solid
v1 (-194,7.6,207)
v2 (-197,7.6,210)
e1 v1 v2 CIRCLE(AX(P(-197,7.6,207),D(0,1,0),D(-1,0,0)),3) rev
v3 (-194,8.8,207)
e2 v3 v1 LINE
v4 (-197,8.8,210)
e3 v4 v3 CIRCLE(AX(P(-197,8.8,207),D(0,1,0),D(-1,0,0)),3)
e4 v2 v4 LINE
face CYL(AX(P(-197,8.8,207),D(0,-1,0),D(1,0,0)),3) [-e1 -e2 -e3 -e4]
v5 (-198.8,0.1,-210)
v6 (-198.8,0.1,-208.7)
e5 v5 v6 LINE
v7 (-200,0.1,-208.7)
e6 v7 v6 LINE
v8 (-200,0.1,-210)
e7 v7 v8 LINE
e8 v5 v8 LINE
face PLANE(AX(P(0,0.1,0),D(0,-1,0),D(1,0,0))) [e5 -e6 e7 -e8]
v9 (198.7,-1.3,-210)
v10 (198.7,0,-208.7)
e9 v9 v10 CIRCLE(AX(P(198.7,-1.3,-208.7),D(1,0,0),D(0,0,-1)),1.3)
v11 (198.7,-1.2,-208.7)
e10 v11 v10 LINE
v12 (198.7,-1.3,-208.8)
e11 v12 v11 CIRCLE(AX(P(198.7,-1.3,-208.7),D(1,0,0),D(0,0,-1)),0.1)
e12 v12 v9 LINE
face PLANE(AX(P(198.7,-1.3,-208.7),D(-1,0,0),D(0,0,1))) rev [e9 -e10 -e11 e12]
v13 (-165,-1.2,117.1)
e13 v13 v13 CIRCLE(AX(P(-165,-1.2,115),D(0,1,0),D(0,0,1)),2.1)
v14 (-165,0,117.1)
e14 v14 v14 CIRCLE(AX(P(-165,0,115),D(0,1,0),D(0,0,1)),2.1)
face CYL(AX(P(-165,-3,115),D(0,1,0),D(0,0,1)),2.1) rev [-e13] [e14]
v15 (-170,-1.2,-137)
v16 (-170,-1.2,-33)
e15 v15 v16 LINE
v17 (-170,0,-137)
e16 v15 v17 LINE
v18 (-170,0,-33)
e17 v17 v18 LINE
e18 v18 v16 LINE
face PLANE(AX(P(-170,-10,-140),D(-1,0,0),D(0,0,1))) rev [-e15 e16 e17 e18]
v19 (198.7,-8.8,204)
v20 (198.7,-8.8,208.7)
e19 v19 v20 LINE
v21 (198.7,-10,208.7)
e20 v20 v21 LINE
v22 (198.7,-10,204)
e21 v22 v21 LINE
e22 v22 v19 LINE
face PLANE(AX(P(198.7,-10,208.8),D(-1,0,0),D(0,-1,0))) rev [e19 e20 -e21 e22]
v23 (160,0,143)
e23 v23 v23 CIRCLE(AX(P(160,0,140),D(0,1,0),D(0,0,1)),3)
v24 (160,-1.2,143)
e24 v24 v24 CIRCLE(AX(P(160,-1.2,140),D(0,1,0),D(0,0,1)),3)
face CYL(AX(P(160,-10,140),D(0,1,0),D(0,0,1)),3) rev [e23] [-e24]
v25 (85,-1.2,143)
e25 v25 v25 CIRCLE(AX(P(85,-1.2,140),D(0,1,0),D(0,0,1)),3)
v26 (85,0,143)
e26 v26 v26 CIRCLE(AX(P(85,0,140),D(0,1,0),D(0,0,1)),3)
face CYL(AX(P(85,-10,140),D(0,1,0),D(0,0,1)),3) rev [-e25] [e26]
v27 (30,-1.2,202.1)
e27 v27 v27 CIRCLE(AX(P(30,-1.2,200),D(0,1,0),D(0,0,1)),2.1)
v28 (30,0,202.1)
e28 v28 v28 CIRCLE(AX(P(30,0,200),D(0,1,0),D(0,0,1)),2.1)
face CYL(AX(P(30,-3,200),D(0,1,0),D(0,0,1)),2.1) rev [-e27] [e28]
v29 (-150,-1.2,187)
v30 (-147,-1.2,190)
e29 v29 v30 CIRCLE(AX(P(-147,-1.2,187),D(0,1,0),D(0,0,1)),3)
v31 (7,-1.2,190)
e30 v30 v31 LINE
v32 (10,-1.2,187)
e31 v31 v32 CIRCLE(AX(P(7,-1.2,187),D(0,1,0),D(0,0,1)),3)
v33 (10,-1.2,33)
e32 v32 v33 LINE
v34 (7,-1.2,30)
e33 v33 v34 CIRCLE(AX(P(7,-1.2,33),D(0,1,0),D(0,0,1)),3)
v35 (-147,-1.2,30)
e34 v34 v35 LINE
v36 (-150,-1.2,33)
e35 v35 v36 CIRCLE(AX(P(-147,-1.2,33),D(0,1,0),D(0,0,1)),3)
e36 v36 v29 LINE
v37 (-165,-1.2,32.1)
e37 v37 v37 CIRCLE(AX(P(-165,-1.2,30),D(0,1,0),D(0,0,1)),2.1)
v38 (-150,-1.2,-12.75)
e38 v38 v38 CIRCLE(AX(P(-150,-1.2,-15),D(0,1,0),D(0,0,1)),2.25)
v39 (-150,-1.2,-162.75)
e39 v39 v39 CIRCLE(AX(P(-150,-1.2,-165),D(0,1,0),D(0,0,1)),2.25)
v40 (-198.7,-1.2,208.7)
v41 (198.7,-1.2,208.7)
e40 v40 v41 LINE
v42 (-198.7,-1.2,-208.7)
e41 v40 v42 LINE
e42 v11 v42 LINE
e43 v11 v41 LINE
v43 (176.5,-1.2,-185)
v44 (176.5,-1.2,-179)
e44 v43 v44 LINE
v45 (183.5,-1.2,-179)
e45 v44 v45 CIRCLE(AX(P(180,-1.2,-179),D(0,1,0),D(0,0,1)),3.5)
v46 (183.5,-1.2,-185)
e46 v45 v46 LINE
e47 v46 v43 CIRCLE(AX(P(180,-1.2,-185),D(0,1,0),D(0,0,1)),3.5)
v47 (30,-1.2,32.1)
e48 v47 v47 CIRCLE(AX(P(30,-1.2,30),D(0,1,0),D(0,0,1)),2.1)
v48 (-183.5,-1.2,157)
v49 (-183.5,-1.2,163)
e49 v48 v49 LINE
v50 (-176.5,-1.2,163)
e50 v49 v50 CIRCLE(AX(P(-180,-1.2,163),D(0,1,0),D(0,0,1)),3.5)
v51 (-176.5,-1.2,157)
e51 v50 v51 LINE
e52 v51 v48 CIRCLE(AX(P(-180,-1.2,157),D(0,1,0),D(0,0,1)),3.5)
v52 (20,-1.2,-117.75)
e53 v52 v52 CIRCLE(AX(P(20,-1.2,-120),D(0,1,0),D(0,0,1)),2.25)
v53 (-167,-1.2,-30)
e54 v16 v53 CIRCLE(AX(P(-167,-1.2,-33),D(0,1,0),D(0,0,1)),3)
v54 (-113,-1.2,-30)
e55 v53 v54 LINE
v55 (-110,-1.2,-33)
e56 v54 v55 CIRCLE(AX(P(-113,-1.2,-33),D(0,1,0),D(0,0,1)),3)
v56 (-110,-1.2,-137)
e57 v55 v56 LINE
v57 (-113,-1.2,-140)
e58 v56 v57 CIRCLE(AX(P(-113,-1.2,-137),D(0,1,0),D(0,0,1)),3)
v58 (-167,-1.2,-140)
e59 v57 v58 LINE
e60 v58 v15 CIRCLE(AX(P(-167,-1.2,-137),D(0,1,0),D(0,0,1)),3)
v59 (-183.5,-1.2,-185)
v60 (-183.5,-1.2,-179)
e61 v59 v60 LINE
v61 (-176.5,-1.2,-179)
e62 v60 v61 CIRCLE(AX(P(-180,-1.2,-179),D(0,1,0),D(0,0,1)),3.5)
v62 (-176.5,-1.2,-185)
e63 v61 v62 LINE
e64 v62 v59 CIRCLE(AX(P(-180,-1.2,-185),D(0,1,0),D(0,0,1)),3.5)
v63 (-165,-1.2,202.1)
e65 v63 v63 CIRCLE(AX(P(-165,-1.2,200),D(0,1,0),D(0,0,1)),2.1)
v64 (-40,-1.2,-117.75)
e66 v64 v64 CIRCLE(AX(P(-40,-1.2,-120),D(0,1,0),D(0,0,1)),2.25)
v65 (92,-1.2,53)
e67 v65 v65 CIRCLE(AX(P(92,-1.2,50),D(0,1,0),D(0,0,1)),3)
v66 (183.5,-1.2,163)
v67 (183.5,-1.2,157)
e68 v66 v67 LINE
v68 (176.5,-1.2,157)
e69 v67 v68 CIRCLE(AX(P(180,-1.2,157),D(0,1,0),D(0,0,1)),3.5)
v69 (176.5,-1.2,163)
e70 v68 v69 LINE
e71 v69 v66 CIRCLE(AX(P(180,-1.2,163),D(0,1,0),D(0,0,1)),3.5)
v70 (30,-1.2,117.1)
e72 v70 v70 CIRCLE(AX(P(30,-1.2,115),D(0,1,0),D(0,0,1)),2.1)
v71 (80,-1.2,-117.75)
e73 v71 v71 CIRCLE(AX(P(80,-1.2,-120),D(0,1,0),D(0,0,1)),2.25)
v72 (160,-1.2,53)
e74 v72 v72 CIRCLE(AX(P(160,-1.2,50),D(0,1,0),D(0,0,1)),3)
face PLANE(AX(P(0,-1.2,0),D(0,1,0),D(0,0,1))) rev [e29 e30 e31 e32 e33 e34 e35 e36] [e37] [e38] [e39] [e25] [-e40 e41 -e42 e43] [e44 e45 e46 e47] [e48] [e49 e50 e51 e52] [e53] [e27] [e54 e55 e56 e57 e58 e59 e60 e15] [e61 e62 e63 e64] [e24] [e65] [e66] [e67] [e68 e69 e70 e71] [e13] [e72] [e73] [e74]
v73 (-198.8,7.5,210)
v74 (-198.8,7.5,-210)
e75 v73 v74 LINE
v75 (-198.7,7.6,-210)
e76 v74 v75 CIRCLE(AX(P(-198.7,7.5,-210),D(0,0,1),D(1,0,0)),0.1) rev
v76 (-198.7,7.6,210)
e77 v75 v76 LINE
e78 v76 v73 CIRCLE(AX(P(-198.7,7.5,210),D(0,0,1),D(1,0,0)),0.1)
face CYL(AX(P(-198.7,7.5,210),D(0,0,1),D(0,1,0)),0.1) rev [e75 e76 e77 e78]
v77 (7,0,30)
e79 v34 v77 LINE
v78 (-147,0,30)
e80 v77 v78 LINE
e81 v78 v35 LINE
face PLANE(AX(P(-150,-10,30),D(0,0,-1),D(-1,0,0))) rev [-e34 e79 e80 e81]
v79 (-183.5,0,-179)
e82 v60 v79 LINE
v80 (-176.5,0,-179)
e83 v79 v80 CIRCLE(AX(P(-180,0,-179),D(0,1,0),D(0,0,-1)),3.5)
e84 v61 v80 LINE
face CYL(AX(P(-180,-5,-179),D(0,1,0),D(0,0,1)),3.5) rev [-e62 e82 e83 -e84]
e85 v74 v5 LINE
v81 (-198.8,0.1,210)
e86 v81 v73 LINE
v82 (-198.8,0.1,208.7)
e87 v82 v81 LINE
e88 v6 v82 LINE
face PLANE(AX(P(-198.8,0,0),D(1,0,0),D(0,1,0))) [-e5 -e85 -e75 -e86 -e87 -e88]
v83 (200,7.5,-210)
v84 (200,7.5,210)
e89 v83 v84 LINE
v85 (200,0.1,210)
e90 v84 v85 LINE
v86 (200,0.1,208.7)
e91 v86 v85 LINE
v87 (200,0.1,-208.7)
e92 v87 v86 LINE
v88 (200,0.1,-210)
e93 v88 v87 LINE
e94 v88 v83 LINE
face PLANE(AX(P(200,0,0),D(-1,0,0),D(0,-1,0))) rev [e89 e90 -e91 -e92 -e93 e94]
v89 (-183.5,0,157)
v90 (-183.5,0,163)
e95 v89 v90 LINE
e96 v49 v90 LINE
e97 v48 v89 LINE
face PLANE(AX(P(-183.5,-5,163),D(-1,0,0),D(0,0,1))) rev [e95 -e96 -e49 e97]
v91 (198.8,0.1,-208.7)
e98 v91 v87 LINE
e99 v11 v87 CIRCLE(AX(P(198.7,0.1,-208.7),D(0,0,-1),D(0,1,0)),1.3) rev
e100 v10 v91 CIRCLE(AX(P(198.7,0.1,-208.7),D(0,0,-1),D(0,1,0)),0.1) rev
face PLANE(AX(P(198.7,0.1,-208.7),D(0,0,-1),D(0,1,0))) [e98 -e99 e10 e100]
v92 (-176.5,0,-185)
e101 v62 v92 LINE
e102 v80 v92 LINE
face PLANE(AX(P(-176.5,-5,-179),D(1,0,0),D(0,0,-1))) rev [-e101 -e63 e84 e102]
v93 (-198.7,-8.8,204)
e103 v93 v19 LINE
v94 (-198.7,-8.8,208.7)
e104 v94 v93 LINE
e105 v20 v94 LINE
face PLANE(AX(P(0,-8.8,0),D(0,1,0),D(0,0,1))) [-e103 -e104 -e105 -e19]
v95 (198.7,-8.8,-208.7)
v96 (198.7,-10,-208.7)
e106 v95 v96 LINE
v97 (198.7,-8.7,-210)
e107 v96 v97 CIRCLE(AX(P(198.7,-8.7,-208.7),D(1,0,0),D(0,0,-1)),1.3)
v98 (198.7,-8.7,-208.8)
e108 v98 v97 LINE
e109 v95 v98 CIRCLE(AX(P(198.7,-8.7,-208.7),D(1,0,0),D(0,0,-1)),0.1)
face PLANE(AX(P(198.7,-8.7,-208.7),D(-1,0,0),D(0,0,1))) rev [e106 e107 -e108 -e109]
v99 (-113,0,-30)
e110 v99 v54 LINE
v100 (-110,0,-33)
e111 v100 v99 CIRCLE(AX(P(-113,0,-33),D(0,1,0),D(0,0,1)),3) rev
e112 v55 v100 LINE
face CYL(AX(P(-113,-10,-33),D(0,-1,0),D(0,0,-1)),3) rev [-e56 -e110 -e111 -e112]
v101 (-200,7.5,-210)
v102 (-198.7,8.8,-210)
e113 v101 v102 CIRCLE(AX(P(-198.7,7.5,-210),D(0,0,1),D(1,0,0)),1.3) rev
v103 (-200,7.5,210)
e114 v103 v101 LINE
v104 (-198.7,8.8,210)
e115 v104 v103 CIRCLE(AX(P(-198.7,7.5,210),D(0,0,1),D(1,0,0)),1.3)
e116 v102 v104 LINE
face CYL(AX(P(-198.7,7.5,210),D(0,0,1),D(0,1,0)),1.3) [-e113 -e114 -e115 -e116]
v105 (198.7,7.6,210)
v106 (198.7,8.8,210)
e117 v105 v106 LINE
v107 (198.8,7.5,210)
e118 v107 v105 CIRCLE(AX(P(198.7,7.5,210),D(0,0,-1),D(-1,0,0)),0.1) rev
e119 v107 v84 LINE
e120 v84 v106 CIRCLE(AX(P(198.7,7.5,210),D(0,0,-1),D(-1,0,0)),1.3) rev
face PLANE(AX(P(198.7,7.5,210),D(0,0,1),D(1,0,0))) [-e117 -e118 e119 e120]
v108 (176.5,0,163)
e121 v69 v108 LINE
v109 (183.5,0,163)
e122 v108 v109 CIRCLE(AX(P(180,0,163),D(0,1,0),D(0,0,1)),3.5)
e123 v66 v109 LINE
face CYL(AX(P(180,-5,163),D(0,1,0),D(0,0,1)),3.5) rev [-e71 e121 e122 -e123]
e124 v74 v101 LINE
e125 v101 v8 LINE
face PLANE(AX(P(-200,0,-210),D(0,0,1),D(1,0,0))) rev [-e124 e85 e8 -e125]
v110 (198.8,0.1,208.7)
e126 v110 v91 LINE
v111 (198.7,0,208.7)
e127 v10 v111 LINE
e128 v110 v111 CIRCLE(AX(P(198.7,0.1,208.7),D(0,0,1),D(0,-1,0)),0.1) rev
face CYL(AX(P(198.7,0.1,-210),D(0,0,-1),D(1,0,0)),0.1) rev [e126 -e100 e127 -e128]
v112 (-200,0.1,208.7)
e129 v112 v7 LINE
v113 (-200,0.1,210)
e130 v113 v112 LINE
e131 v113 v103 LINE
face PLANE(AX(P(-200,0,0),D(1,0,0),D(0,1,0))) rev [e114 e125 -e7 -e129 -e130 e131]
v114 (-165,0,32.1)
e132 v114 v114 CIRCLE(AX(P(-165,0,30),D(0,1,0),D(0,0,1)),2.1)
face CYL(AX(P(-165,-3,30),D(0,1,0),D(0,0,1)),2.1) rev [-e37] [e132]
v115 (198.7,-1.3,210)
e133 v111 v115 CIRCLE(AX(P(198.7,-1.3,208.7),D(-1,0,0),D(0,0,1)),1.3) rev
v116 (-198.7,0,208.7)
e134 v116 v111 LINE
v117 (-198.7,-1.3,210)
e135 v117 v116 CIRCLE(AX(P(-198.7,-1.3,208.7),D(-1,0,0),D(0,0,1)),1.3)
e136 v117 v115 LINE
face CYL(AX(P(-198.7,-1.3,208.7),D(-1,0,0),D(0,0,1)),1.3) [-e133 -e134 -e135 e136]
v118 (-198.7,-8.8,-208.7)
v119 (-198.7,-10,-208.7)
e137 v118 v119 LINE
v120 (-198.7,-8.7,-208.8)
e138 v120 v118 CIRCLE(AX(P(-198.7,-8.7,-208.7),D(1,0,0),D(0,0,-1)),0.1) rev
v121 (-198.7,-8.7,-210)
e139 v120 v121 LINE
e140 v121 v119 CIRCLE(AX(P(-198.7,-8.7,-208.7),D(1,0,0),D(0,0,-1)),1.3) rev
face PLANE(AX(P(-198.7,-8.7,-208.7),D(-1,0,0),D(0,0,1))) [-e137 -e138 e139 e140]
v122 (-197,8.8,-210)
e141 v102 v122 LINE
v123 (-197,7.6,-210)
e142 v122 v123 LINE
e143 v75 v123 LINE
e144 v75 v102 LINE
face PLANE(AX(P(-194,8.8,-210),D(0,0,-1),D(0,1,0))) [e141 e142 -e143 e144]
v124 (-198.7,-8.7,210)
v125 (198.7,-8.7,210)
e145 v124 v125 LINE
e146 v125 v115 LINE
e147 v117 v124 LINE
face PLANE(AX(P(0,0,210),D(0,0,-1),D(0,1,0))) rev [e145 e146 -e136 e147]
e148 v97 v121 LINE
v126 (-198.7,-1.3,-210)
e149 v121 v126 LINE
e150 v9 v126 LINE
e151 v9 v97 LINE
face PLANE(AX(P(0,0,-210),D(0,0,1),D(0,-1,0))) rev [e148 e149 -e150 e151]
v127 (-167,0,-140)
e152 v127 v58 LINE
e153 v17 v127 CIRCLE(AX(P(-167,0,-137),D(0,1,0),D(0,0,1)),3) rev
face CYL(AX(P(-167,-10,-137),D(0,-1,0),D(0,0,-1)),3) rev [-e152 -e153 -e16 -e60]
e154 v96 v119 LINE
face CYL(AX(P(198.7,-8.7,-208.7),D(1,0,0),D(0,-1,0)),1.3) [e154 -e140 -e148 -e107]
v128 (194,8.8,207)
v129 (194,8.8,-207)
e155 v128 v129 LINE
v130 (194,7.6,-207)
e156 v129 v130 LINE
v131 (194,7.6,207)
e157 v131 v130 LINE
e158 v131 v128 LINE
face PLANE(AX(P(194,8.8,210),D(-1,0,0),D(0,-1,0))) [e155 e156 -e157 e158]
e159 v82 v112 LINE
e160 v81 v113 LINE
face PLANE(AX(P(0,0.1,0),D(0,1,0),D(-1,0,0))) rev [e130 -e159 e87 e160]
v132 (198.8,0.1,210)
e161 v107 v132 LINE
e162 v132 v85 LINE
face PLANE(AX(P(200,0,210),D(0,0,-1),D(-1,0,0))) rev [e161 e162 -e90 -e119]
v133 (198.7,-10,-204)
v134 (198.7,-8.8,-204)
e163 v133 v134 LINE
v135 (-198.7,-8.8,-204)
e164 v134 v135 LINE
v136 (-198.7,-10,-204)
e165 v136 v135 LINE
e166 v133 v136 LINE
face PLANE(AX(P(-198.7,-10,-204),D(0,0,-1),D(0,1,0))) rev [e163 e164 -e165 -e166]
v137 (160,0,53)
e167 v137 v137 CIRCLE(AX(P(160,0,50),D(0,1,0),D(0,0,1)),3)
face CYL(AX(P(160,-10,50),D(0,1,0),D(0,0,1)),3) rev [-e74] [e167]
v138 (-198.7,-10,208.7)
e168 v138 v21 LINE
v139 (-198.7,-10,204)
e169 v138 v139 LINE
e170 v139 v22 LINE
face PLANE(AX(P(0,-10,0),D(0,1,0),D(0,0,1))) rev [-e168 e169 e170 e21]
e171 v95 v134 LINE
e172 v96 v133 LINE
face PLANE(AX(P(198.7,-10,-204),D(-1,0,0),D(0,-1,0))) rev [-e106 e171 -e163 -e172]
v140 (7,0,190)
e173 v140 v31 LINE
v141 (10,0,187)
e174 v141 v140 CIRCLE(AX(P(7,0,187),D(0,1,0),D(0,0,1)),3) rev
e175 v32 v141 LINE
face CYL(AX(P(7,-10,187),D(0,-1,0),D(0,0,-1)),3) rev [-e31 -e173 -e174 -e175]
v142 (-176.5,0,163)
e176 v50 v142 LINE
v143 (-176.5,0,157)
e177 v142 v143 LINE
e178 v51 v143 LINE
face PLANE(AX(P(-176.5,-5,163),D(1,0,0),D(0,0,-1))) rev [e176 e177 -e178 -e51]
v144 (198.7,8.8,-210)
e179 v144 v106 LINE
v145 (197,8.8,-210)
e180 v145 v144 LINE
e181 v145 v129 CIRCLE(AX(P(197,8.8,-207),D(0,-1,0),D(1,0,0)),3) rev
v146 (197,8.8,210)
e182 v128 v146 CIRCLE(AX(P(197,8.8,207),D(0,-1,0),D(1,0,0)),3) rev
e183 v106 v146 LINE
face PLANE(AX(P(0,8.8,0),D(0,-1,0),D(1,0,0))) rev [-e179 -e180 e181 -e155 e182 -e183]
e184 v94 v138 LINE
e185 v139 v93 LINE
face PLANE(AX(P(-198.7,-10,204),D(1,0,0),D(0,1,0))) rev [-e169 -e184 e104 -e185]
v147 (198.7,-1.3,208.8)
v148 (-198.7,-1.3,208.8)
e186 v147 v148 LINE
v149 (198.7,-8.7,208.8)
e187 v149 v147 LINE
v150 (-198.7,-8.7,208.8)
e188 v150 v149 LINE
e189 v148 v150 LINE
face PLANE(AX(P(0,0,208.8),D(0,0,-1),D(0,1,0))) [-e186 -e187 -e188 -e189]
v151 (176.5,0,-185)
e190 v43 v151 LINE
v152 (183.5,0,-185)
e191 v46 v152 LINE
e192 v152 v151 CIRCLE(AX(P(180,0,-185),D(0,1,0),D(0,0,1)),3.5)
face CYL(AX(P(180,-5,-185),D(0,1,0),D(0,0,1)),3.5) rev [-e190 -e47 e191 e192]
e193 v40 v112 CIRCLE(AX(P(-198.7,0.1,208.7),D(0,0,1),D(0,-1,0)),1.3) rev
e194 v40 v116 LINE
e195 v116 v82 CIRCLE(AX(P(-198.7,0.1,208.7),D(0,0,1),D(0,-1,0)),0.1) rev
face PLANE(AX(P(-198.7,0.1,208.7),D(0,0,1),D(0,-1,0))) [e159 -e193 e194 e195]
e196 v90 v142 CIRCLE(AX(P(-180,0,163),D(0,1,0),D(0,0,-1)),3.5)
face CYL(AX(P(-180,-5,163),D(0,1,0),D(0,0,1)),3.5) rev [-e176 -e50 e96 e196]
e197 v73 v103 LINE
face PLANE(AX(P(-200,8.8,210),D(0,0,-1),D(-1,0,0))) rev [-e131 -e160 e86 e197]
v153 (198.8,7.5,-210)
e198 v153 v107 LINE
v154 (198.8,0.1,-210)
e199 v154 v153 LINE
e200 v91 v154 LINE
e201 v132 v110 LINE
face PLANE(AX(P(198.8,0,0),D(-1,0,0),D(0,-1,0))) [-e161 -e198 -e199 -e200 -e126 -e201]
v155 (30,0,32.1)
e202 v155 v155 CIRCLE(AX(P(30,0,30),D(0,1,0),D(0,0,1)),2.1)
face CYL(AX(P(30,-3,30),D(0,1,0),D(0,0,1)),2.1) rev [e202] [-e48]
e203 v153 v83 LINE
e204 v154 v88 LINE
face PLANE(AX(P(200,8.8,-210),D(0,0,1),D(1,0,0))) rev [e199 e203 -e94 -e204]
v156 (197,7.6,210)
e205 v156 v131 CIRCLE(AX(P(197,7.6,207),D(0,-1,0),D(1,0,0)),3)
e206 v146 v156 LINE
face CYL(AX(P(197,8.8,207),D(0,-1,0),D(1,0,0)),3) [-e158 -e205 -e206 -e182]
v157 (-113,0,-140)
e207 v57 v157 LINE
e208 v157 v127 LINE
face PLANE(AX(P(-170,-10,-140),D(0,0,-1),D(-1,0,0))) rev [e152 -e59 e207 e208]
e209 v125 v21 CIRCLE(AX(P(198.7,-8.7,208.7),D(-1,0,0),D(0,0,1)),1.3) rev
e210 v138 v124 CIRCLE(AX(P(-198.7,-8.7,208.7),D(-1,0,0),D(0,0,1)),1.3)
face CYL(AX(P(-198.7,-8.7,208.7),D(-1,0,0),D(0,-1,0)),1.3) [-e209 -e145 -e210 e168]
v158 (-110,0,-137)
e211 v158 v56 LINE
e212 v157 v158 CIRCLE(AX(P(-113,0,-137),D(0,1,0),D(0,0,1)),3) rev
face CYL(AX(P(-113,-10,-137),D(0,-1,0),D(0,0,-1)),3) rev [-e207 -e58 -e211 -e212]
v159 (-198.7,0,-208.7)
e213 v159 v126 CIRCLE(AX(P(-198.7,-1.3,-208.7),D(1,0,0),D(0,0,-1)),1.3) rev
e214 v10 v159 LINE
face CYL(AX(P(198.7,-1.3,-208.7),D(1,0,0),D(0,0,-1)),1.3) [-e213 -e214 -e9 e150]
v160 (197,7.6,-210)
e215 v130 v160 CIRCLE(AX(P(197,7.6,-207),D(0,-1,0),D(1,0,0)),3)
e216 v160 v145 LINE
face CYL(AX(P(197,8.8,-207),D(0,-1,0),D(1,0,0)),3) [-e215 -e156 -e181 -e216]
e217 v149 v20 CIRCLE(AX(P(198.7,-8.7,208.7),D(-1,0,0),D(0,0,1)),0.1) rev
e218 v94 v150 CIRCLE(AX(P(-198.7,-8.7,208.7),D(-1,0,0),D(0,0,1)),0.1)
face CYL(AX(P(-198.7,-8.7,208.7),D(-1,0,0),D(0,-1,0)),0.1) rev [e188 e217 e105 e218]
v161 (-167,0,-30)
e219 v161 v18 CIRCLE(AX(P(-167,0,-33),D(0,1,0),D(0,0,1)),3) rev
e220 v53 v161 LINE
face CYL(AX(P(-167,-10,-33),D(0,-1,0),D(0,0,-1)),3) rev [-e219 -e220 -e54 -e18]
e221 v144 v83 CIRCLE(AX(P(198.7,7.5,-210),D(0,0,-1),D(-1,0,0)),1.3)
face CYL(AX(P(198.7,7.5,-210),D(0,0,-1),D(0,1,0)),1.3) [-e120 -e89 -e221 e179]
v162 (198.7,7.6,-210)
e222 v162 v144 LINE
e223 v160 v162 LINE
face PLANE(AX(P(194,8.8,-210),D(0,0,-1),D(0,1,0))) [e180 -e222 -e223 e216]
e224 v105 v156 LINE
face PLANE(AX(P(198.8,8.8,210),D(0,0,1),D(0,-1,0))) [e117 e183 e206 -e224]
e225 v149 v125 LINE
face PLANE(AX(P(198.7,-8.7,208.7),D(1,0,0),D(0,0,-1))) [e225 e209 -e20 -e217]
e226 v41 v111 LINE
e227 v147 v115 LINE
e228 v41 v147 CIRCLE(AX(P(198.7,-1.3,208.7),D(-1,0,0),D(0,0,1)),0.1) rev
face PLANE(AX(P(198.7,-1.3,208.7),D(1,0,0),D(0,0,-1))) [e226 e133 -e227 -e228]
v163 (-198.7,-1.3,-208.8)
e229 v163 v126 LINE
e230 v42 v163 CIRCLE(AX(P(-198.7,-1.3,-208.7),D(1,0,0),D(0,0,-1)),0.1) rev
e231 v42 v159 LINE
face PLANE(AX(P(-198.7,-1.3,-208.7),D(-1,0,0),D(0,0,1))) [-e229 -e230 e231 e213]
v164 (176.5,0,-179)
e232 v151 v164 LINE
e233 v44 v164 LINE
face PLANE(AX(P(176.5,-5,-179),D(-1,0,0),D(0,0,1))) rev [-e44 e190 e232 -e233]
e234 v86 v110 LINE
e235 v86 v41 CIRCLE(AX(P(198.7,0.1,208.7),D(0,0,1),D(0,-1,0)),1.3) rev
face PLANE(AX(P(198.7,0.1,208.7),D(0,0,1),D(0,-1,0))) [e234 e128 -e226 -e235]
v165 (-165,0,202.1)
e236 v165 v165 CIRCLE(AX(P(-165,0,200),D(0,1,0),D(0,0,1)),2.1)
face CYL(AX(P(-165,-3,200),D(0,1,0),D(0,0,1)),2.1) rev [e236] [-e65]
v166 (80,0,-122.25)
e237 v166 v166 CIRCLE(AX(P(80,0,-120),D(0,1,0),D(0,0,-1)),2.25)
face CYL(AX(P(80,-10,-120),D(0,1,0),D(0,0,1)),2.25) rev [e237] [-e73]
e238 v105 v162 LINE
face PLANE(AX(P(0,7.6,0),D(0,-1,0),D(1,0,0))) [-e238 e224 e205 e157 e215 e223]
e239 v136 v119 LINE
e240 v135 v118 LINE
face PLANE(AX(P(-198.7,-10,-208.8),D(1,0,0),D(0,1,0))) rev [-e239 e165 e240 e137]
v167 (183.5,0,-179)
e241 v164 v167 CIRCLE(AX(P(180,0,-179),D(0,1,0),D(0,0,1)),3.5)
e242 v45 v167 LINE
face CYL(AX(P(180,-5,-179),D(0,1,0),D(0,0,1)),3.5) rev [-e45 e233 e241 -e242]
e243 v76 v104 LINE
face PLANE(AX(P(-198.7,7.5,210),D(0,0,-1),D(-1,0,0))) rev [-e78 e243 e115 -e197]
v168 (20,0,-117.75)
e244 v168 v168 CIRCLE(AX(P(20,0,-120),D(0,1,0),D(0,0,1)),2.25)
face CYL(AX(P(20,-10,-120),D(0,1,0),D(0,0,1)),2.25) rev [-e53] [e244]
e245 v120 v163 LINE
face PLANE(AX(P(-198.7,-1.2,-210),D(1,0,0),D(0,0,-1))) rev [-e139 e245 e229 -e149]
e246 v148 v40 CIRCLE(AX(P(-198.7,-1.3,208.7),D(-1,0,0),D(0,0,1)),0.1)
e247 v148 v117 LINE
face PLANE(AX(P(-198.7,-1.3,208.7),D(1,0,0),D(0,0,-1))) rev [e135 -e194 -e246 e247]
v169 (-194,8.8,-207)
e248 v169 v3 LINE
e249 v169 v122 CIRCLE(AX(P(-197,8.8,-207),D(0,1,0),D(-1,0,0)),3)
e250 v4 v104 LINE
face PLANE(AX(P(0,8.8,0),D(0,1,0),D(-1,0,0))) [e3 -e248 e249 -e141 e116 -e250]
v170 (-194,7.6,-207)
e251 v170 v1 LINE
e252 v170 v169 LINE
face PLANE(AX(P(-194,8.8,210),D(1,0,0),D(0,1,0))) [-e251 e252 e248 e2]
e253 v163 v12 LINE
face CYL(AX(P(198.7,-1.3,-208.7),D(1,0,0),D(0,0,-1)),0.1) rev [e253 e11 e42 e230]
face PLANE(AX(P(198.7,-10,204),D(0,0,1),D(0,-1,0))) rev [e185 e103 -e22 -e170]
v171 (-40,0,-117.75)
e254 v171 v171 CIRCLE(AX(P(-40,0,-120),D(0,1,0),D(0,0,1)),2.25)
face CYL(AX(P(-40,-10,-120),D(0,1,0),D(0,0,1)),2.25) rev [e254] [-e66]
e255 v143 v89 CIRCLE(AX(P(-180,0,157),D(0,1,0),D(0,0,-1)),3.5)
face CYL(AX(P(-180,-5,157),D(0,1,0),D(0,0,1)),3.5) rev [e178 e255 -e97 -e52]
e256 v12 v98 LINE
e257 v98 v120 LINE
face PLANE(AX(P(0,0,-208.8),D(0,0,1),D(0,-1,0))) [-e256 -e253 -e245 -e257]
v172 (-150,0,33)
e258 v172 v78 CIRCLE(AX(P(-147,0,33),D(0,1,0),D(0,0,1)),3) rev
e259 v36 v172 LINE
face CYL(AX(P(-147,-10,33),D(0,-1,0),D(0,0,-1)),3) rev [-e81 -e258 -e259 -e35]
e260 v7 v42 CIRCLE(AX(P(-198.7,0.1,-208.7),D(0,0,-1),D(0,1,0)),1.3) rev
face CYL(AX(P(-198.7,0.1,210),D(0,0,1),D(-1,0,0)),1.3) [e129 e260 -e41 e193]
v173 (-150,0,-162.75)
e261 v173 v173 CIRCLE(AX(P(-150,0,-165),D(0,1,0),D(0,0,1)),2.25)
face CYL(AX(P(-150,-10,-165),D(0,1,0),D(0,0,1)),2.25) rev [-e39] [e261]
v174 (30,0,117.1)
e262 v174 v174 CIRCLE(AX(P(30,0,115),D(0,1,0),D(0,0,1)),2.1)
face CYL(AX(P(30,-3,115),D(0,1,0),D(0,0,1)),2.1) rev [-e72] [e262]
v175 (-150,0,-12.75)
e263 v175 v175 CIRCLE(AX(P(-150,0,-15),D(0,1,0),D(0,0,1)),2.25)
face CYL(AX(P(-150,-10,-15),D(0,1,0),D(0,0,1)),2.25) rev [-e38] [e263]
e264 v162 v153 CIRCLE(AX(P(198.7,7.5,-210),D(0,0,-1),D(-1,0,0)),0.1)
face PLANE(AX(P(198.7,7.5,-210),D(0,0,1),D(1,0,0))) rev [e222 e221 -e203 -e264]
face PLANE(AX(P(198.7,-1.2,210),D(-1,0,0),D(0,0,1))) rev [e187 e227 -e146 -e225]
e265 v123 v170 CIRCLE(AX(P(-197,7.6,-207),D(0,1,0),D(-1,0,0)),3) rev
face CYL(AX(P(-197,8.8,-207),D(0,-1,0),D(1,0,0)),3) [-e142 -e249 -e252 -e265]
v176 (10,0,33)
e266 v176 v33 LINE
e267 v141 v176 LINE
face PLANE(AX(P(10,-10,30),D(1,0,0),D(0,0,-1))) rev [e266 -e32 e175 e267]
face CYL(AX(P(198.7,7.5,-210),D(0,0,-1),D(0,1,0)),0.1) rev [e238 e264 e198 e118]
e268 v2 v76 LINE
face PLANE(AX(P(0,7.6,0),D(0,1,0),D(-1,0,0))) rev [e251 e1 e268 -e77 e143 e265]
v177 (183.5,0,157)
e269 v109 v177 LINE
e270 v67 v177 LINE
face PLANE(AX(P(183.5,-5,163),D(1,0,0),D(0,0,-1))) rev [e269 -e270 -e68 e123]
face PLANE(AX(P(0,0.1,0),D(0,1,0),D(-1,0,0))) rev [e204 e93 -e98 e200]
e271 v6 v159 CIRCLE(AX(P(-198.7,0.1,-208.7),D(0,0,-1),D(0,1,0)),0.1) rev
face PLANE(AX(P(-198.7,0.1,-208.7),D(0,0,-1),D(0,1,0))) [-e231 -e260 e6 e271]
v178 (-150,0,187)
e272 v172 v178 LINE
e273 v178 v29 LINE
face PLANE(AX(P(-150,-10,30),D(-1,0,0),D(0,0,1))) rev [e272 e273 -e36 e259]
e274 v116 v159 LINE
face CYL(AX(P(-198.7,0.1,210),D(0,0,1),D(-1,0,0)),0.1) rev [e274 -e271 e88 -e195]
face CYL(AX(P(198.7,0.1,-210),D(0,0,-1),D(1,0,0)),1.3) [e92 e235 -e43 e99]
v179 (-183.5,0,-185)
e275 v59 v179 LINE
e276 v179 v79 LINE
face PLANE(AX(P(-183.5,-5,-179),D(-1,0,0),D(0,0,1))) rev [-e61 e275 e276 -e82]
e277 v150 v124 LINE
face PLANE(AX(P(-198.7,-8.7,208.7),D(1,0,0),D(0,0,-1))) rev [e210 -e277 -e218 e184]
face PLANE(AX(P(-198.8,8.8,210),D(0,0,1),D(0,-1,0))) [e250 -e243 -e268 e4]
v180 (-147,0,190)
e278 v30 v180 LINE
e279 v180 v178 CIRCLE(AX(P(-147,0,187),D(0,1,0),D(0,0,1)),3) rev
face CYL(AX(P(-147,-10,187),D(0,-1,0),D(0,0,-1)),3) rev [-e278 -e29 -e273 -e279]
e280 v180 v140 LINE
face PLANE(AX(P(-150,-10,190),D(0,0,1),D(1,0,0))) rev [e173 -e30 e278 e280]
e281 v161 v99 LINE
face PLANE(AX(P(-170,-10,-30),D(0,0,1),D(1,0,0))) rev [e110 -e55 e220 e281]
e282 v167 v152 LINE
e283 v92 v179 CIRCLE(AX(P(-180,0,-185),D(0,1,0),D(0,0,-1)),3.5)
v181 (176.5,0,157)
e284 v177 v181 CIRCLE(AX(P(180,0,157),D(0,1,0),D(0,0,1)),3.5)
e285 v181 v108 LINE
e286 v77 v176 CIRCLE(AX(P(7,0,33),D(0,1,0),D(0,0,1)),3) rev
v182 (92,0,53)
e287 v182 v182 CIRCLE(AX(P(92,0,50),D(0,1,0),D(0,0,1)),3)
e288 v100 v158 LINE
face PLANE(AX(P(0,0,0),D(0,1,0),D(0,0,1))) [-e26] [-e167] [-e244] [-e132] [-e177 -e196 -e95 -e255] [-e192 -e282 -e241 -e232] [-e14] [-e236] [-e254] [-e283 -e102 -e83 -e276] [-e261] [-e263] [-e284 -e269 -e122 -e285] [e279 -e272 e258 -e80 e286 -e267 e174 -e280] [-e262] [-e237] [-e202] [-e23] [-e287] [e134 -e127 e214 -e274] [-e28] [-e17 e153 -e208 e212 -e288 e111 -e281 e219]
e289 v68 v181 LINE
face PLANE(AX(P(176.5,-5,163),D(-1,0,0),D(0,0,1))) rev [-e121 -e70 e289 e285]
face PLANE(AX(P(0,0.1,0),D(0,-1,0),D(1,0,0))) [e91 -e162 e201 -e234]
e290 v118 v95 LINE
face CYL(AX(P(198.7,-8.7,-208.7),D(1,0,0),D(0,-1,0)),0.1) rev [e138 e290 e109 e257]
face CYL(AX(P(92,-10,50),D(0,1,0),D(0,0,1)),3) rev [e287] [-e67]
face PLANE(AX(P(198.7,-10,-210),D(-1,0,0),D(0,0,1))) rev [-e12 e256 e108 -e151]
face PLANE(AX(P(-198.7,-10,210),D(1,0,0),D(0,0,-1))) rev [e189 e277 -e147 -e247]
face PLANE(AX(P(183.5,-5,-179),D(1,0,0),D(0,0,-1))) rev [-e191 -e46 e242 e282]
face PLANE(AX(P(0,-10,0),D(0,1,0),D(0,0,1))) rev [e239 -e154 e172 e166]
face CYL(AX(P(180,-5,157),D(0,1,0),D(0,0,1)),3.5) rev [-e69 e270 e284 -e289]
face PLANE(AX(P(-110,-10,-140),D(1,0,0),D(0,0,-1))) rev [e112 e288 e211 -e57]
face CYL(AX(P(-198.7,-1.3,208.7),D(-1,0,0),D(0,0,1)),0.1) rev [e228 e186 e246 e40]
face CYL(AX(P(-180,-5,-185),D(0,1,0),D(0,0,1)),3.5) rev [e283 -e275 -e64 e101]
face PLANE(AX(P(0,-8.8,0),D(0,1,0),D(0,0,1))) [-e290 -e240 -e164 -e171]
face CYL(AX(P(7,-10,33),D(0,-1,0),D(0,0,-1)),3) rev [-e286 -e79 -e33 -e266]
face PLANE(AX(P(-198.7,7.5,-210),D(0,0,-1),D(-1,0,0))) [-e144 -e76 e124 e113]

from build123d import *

# Parameters (mm, degrees)
SKETCH_1_W                         = 400
SKETCH_1_H                         = 420
SM_BASE_FLANGE_1_DEPTH             = 1.2
SM_EDGE_FLANGE_1_STRIP_W           = 5
SM_EDGE_FLANGE_1_STRIP_H           = 1.2
SM_EDGE_FLANGE_1_STRIP_CUT_DEPTH   = 420
SM_EDGE_FLANGE_1_STRIP_2_W         = 5
SM_EDGE_FLANGE_1_STRIP_2_H         = 1.2
SM_EDGE_FLANGE_1_STRIP_CUT_2_DEPTH = 420
SM_EDGE_FLANGE_1_DEPTH             = 420
SM_EDGE_FLANGE_1_BEND_DEPTH        = 420
SM_EDGE_FLANGE_2_STRIP_W           = 5
SM_EDGE_FLANGE_2_STRIP_H           = 1.2
SM_EDGE_FLANGE_2_STRIP_CUT_DEPTH   = 420
SM_EDGE_FLANGE_2_STRIP_2_W         = 5
SM_EDGE_FLANGE_2_STRIP_2_H         = 1.2
SM_EDGE_FLANGE_2_STRIP_CUT_2_DEPTH = 420
SM_EDGE_FLANGE_2_DEPTH             = 420
SM_EDGE_FLANGE_2_BEND_DEPTH        = 420
SM_START                           = -200
SM_EDGE_FLANGE_3_DEPTH             = 400
SM_EDGE_FLANGE_3_2_DEPTH           = 1.3
SM_START_2                         = 198.7
SM_EDGE_FLANGE_3_3_DEPTH           = 1.3
SM_START_3                         = -198.7
SM_EDGE_FLANGE_3_4_DEPTH           = 397.4
SM_EDGE_FLANGE_4_STRIP_W           = 5
SM_EDGE_FLANGE_4_STRIP_H           = 1.2
SM_EDGE_FLANGE_4_STRIP_CUT_DEPTH   = 397.4
SM_EDGE_FLANGE_4_STRIP_2_W         = 5
SM_EDGE_FLANGE_4_STRIP_2_H         = 1.2
SM_EDGE_FLANGE_4_STRIP_CUT_2_DEPTH = 397.4
SM_EDGE_FLANGE_4_DEPTH             = 397.4
SM_EDGE_FLANGE_4_BEND_DEPTH        = 397.4
FILLET_1_R                         = 3
SKETCH_40_R                        = 2.25
CUT_EXTRUDE_2_DEPTH                = 10
SKETCH_45_R                        = 1.5
CUT_EXTRUDE_3_DEPTH                = 3
SKETCH_48_R                        = 2.25
CUT_EXTRUDE_6_DEPTH                = 10
SKETCH_50_W                        = 60
SKETCH_50_H                        = 110
CUT_EXTRUDE_7_DEPTH                = 10
SKETCH_52_W                        = 160
SKETCH_52_H                        = 160
CUT_EXTRUDE_10_DEPTH               = 10
FILLET_2_R                         = 3
FILLET_4_R                         = 3
SKETCH_54_R                        = 2.1
SKETCH_54_R_2                      = 1.5
EXTRUDE_1_DEPTH                    = 5
EXTRUDE_1_2_DEPTH                  = 5
EXTRUDE_1_3_DEPTH                  = 5
EXTRUDE_1_4_DEPTH                  = 5
EXTRUDE_1_5_DEPTH                  = 5
EXTRUDE_1_6_DEPTH                  = 5
CUT_EXTRUDE_11_DEPTH               = 5
SKETCH_56_R                        = 3
CUT_EXTRUDE_12_DEPTH               = 10
M3_DR_BY                           = 0.6
M3_DR_1_BY                         = 0.6
M3_DR_2_BY                         = 0.6
M3_DR_3_BY                         = 0.6
M3_DR_4_START                      = -1.2
M3_DR_4_OUTLINE_R                  = 2.1
M3_DR_4_OUTLINE_R_2                = 1.5
M3_DR_4_DEPTH                      = 1.2
M3_DR_5_START                      = -1.2
M3_DR_5_OUTLINE_R                  = 2.1
M3_DR_5_OUTLINE_R_2                = 1.5
M3_DR_5_DEPTH                      = 1.2


# Read off the part's stored shape, not the designer's step: 边线-法兰3, 压铆螺母柱【M3】_Dr底孔4, 压铆螺母柱【M3】_Dr底孔5
# Sheet-metal steps are written as plain solids
with BuildPart() as part:
    # Sketch 1 → 基体-法兰1 (new body)
    with BuildSketch(Plane(origin=(0, 0, 0), x_dir=(1, 0, 0), z_dir=(0, 1, 0))):
        Rectangle(SKETCH_1_W, SKETCH_1_H)
    extrude(amount=-SM_BASE_FLANGE_1_DEPTH)

    # 边线-法兰1 strip (across the edge) → 边线-法兰1 strip cut (cut)
    with BuildSketch(Plane(origin=(-200, 0, -210), x_dir=(1, 0, 0), z_dir=(0, 0, 1))):
        with Locations((-1.2, -0.6)):
            Rectangle(SM_EDGE_FLANGE_1_STRIP_W, SM_EDGE_FLANGE_1_STRIP_H)
    extrude(amount=SM_EDGE_FLANGE_1_STRIP_CUT_DEPTH, mode=Mode.SUBTRACT)

    # 边线-法兰1 strip 2 (across the edge) → 边线-法兰1 strip cut 2 (cut)
    with BuildSketch(Plane(origin=(200, 0, 210), x_dir=(-1, 0, 0), z_dir=(0, 0, -1))):
        with Locations((-1.2, -0.6)):
            Rectangle(SM_EDGE_FLANGE_1_STRIP_2_W, SM_EDGE_FLANGE_1_STRIP_2_H)
    extrude(amount=SM_EDGE_FLANGE_1_STRIP_CUT_2_DEPTH, mode=Mode.SUBTRACT)

    # 边线-法兰1 section (across the edge) → 边线-法兰1 (add)
    with BuildSketch(Plane(origin=(-200, 0, -210), x_dir=(1, 0, 0), z_dir=(0, 0, 1))):
        with BuildLine():
            Line((0, 0.1), (0, 8.8))
            Line((0, 8.8), (1.2, 8.8))
            Line((1.2, 8.8), (1.2, 0.1))
            ThreePointArc((1.2, 0.1), (1.229289322, 0.029289322), (1.3, 0))
            Line((1.3, 0), (1.3, -1.2))
            ThreePointArc((1.3, -1.2), (0.380761184, -0.819238816), (0, 0.1))
        make_face()
    extrude(amount=SM_EDGE_FLANGE_1_DEPTH)

    # 边线-法兰1 section 2 (across the edge) → 边线-法兰1 bend (add)
    with BuildSketch(Plane(origin=(200, 0, 210), x_dir=(-1, 0, 0), z_dir=(0, 0, -1))):
        with BuildLine():
            Line((0, 0.1), (0, 8.8))
            Line((0, 8.8), (1.2, 8.8))
            Line((1.2, 8.8), (1.2, 0.1))
            ThreePointArc((1.2, 0.1), (1.229289322, 0.029289322), (1.3, 0))
            Line((1.3, 0), (1.3, -1.2))
            ThreePointArc((1.3, -1.2), (0.380761184, -0.819238816), (0, 0.1))
        make_face()
    extrude(amount=SM_EDGE_FLANGE_1_BEND_DEPTH)

    # 边线-法兰2 strip (across the edge) → 边线-法兰2 strip cut (cut)
    with BuildSketch(Plane(origin=(-198.8, 8.8, -210), x_dir=(0, -1, 0), z_dir=(0, 0, 1))):
        with Locations((-1.2, -0.6)):
            Rectangle(SM_EDGE_FLANGE_2_STRIP_W, SM_EDGE_FLANGE_2_STRIP_H)
    extrude(amount=SM_EDGE_FLANGE_2_STRIP_CUT_DEPTH, mode=Mode.SUBTRACT)

    # 边线-法兰2 strip 2 (across the edge) → 边线-法兰2 strip cut 2 (cut)
    with BuildSketch(Plane(origin=(198.8, 8.8, 210), x_dir=(0, -1, 0), z_dir=(0, 0, -1))):
        with Locations((-1.2, -0.6)):
            Rectangle(SM_EDGE_FLANGE_2_STRIP_2_W, SM_EDGE_FLANGE_2_STRIP_2_H)
    extrude(amount=SM_EDGE_FLANGE_2_STRIP_CUT_2_DEPTH, mode=Mode.SUBTRACT)

    # 边线-法兰2 section (across the edge) → 边线-法兰2 (add)
    with BuildSketch(Plane(origin=(-198.8, 8.8, -210), x_dir=(0, -1, 0), z_dir=(0, 0, 1))):
        with BuildLine():
            Line((0, 0.1), (0, 4.8))
            Line((0, 4.8), (1.2, 4.8))
            Line((1.2, 4.8), (1.2, 0.1))
            ThreePointArc((1.2, 0.1), (1.229289322, 0.029289322), (1.3, 0))
            Line((1.3, 0), (1.3, -1.2))
            ThreePointArc((1.3, -1.2), (0.380761184, -0.819238816), (0, 0.1))
        make_face()
    extrude(amount=SM_EDGE_FLANGE_2_DEPTH)

    # 边线-法兰2 section 2 (across the edge) → 边线-法兰2 bend (add)
    with BuildSketch(Plane(origin=(198.8, 8.8, 210), x_dir=(0, -1, 0), z_dir=(0, 0, -1))):
        with BuildLine():
            Line((0, 0.1), (0, 4.8))
            Line((0, 4.8), (1.2, 4.8))
            Line((1.2, 4.8), (1.2, 0.1))
            ThreePointArc((1.2, 0.1), (1.229289322, 0.029289322), (1.3, 0))
            Line((1.3, 0), (1.3, -1.2))
            ThreePointArc((1.3, -1.2), (0.380761184, -0.819238816), (0, 0.1))
        make_face()
    extrude(amount=SM_EDGE_FLANGE_2_BEND_DEPTH)

    # 边线-法兰3 outline → 边线-法兰3 (cut)
    with BuildSketch(Plane.YZ.offset(SM_START)):
        with BuildLine():
            Line((0.1, -210), (0.1, -208.7))
            Line((0.1, -208.7), (0, -208.7))
            ThreePointArc((0, -208.7), (-0.346060798, -209.583176087), (-1.2, -209.99614814))
            Line((-1.2, -209.99614814), (-1.2, -210))
            Line((-1.2, -210), (0.1, -210))
        make_face()
        with BuildLine():
            Line((0.1, 210), (-1.2, 210))
            Line((-1.2, 210), (-1.2, 209.99614814))
            ThreePointArc((-1.2, 209.99614814), (-0.346060798, 209.583176087), (0, 208.7))
            Line((0, 208.7), (0.1, 208.7))
            Line((0.1, 208.7), (0.1, 210))
        make_face()
    extrude(amount=SM_EDGE_FLANGE_3_DEPTH, mode=Mode.SUBTRACT)

    # Sm Edge Flange 3 2 outline → Sm Edge Flange 3 2 (cut)
    with BuildSketch(Plane.YZ.offset(SM_START)):
        with BuildLine():
            ThreePointArc((-1.2, -209.99614814), (-0.346060798, -209.583176087), (0, -208.7))
            Line((0, -208.7), (-1.2, -208.7))
            Line((-1.2, -208.7), (-1.2, -209.99614814))
        make_face()
        with BuildLine():
            Line((-1.2, 208.7), (0, 208.7))
            ThreePointArc((0, 208.7), (-0.346060798, 209.583176087), (-1.2, 209.99614814))
            Line((-1.2, 209.99614814), (-1.2, 208.7))
        make_face()
    extrude(amount=SM_EDGE_FLANGE_3_2_DEPTH, mode=Mode.SUBTRACT)

    # Sm Edge Flange 3 3 outline → Sm Edge Flange 3 3 (cut)
    with BuildSketch(Plane.YZ.offset(SM_START_2)):
        with BuildLine():
            ThreePointArc((-1.2, -209.99614814), (-0.346060798, -209.583176087), (0, -208.7))
            Line((0, -208.7), (-1.2, -208.7))
            Line((-1.2, -208.7), (-1.2, -209.99614814))
        make_face()
        with BuildLine():
            Line((-1.2, 208.7), (0, 208.7))
            ThreePointArc((0, 208.7), (-0.346060798, 209.583176087), (-1.2, 209.99614814))
            Line((-1.2, 209.99614814), (-1.2, 208.7))
        make_face()
    extrude(amount=SM_EDGE_FLANGE_3_3_DEPTH, mode=Mode.SUBTRACT)

    # Sm Edge Flange 3 4 outline → Sm Edge Flange 3 4 (add)
    with BuildSketch(Plane.YZ.offset(SM_START_3)):
        with BuildLine():
            Line((-1.2, -209.99614814), (-1.2, -208.7))
            ThreePointArc((-1.2, -208.7), (-1.229289322, -208.770710678), (-1.3, -208.8))
            Line((-1.3, -208.8), (-10, -208.8))
            Line((-10, -208.8), (-10, -210))
            Line((-10, -210), (-1.3, -210))
            ThreePointArc((-1.3, -210), (-1.249962922, -209.999036678), (-1.2, -209.99614814))
        make_face()
        with BuildLine():
            ThreePointArc((-1.3, 208.8), (-1.229289322, 208.770710678), (-1.2, 208.7))
            Line((-1.2, 208.7), (-1.2, 209.99614814))
            ThreePointArc((-1.2, 209.99614814), (-1.249962922, 209.999036678), (-1.3, 210))
            Line((-1.3, 210), (-10, 210))
            Line((-10, 210), (-10, 208.8))
            Line((-10, 208.8), (-1.3, 208.8))
        make_face()
    extrude(amount=SM_EDGE_FLANGE_3_4_DEPTH)

    # 边线-法兰4 strip (across the edge) → 边线-法兰4 strip cut (cut)
    with BuildSketch(Plane(origin=(-198.7, -10, -208.8), x_dir=(0, 1, 0), z_dir=(1, 0, 0))):
        with Locations((-1.2, -0.6)):
            Rectangle(SM_EDGE_FLANGE_4_STRIP_W, SM_EDGE_FLANGE_4_STRIP_H)
    extrude(amount=SM_EDGE_FLANGE_4_STRIP_CUT_DEPTH, mode=Mode.SUBTRACT)

    # 边线-法兰4 strip 2 (across the edge) → 边线-法兰4 strip cut 2 (cut)
    with BuildSketch(Plane(origin=(198.7, -10, 208.8), x_dir=(0, 1, 0), z_dir=(-1, 0, 0))):
        with Locations((-1.2, -0.6)):
            Rectangle(SM_EDGE_FLANGE_4_STRIP_2_W, SM_EDGE_FLANGE_4_STRIP_2_H)
    extrude(amount=SM_EDGE_FLANGE_4_STRIP_CUT_2_DEPTH, mode=Mode.SUBTRACT)

    # 边线-法兰4 section (across the edge) → 边线-法兰4 (add)
    with BuildSketch(Plane(origin=(-198.7, -10, -208.8), x_dir=(0, 1, 0), z_dir=(1, 0, 0))):
        with BuildLine():
            Line((0, 0.1), (0, 4.8))
            Line((0, 4.8), (1.2, 4.8))
            Line((1.2, 4.8), (1.2, 0.1))
            ThreePointArc((1.2, 0.1), (1.229289322, 0.029289322), (1.3, 0))
            Line((1.3, 0), (1.3, -1.2))
            ThreePointArc((1.3, -1.2), (0.380761184, -0.819238816), (0, 0.1))
        make_face()
    extrude(amount=SM_EDGE_FLANGE_4_DEPTH)

    # 边线-法兰4 section 2 (across the edge) → 边线-法兰4 bend (add)
    with BuildSketch(Plane(origin=(198.7, -10, 208.8), x_dir=(0, 1, 0), z_dir=(-1, 0, 0))):
        with BuildLine():
            Line((0, 0.1), (0, 4.8))
            Line((0, 4.8), (1.2, 4.8))
            Line((1.2, 4.8), (1.2, 0.1))
            ThreePointArc((1.2, 0.1), (1.229289322, 0.029289322), (1.3, 0))
            Line((1.3, 0), (1.3, -1.2))
            ThreePointArc((1.3, -1.2), (0.380761184, -0.819238816), (0, 0.1))
        make_face()
    extrude(amount=SM_EDGE_FLANGE_4_BEND_DEPTH)

    # 圆角1
    fillet_1_edges = [part.edges().sort_by_distance(p)[0] for p in [
        (-194, 8.2, -210),
        (-194, 8.2, 210),
        (194, 8.2, 210),
        (194, 8.2, -210),
    ]]
    fillet(fillet_1_edges, radius=FILLET_1_R)

    # 草图40 → 切除-拉伸2 (cut)
    with BuildSketch(Plane(origin=(0, 0, 0), x_dir=(1, 0, 0), z_dir=(0, 1, 0))):
        with Locations(Location((-40, 120, 0), (0, 0, 270))):
            Circle(SKETCH_40_R)
        with Locations(Location((20, 120, 0), (0, 0, 270))):
            Circle(SKETCH_40_R)
        with Locations(Location((80, 120, 0), (0, 0, 270))):
            Circle(SKETCH_40_R)
    extrude(amount=-CUT_EXTRUDE_2_DEPTH, mode=Mode.SUBTRACT)

    # 草图45 → 切除-拉伸3 (cut)
    with BuildSketch(Plane(origin=(0, 0, 0), x_dir=(1, 0, 0), z_dir=(0, 1, 0))):
        with Locations(Location((-165, -30, 0), (0, 0, 270))):
            Circle(SKETCH_45_R)
        with Locations(Location((30, -200, 0), (0, 0, 270))):
            Circle(SKETCH_45_R)
        with Locations(Location((-165, -200, 0), (0, 0, 270))):
            Circle(SKETCH_45_R)
        with Locations(Location((30, -30, 0), (0, 0, 270))):
            Circle(SKETCH_45_R)
        with Locations(Location((-165, -115, 0), (0, 0, 270))):
            Circle(SKETCH_45_R)
        with Locations(Location((30, -115, 0), (0, 0, 270))):
            Circle(SKETCH_45_R)
    extrude(amount=-CUT_EXTRUDE_3_DEPTH, mode=Mode.SUBTRACT)

    # 草图48 → 切除-拉伸6 (cut)
    with BuildSketch(Plane(origin=(0, 0, 0), x_dir=(1, 0, 0), z_dir=(0, 1, 0))):
        with Locations(Location((-150, 165, 0), (0, 0, 270))):
            Circle(SKETCH_48_R)
        with Locations(Location((-150, 15, 0), (0, 0, 270))):
            Circle(SKETCH_48_R)
    extrude(amount=-CUT_EXTRUDE_6_DEPTH, mode=Mode.SUBTRACT)

    # 草图50 → 切除-拉伸7 (cut)
    with BuildSketch(Plane(origin=(0, 0, 0), x_dir=(1, 0, 0), z_dir=(0, 1, 0))):
        with Locations((-140, 85)):
            Rectangle(SKETCH_50_W, SKETCH_50_H)
    extrude(amount=-CUT_EXTRUDE_7_DEPTH, mode=Mode.SUBTRACT)

    # 草图52 → 切除-拉伸10 (cut)
    with BuildSketch(Plane(origin=(0, 0, 0), x_dir=(1, 0, 0), z_dir=(0, 1, 0))):
        with Locations((-70, -110)):
            Rectangle(SKETCH_52_W, SKETCH_52_H)
    extrude(amount=-CUT_EXTRUDE_10_DEPTH, mode=Mode.SUBTRACT)

    # 圆角2
    fillet_2_edges = [part.edges().sort_by_distance(p)[0] for p in [
        (-170, -0.6, -30),
        (-170, -0.6, -140),
        (-110, -0.6, -140),
        (-110, -0.6, -30),
    ]]
    fillet(fillet_2_edges, radius=FILLET_2_R)

    # 圆角4
    fillet_4_edges = [part.edges().sort_by_distance(p)[0] for p in [
        (-150, -0.6, 190),
        (-150, -0.6, 30),
        (10, -0.6, 30),
        (10, -0.6, 190),
    ]]
    fillet(fillet_4_edges, radius=FILLET_4_R)

    # 草图55 → 切除-拉伸11 (cut)
    with BuildSketch(Plane(origin=(0, 0, 0), x_dir=(1, 0, 0), z_dir=(0, 1, 0))):
        with BuildLine():
            Line((176.5, -163), (176.5, -157))
            ThreePointArc((176.5, -157), (180, -153.5), (183.5, -157))
            Line((183.5, -157), (183.5, -163))
            ThreePointArc((183.5, -163), (180, -166.5), (176.5, -163))
        make_face()
        with BuildLine():
            Line((176.5, 179), (176.5, 185))
            ThreePointArc((176.5, 185), (180, 188.5), (183.5, 185))
            Line((183.5, 185), (183.5, 179))
            ThreePointArc((183.5, 179), (180, 175.5), (176.5, 179))
        make_face()
        with BuildLine():
            Line((-176.5, 179), (-176.5, 185))
            ThreePointArc((-176.5, 185), (-180, 188.5), (-183.5, 185))
            Line((-183.5, 185), (-183.5, 179))
            ThreePointArc((-183.5, 179), (-180, 175.5), (-176.5, 179))
        make_face()
        with BuildLine():
            Line((-176.5, -163), (-176.5, -157))
            ThreePointArc((-176.5, -157), (-180, -153.5), (-183.5, -157))
            Line((-183.5, -157), (-183.5, -163))
            ThreePointArc((-183.5, -163), (-180, -166.5), (-176.5, -163))
        make_face()
    extrude(amount=-CUT_EXTRUDE_11_DEPTH, mode=Mode.SUBTRACT)

    # 草图56 → 切除-拉伸12 (cut)
    with BuildSketch(Plane(origin=(0, 0, 0), x_dir=(1, 0, 0), z_dir=(0, 1, 0))):
        with Locations(Location((160, -50, 0), (0, 0, 270))):
            Circle(SKETCH_56_R)
        with Locations(Location((92, -50, 0), (0, 0, 270))):
            Circle(SKETCH_56_R)
        with Locations(Location((160, -140, 0), (0, 0, 270))):
            Circle(SKETCH_56_R)
        with Locations(Location((85, -140, 0), (0, 0, 270))):
            Circle(SKETCH_56_R)
    extrude(amount=-CUT_EXTRUDE_12_DEPTH, mode=Mode.SUBTRACT)

    # 压铆螺母柱【M3】_Dr底孔: a curved face moved inward by 0.6
    add(Solid.thicken(part.faces().sort_by_distance((-165, -0.6, 198.5))[0], -M3_DR_BY), mode=Mode.SUBTRACT)

    # 压铆螺母柱【M3】_Dr底孔1: a curved face moved inward by 0.6
    add(Solid.thicken(part.faces().sort_by_distance((-165, -0.6, 113.5))[0], -M3_DR_1_BY), mode=Mode.SUBTRACT)

    # 压铆螺母柱【M3】_Dr底孔2: a curved face moved inward by 0.6
    add(Solid.thicken(part.faces().sort_by_distance((30, -0.6, 198.5))[0], -M3_DR_2_BY), mode=Mode.SUBTRACT)

    # 压铆螺母柱【M3】_Dr底孔3: a curved face moved inward by 0.6
    add(Solid.thicken(part.faces().sort_by_distance((-165, -0.6, 28.5))[0], -M3_DR_3_BY), mode=Mode.SUBTRACT)

    # 压铆螺母柱【M3】_Dr底孔4 outline → 压铆螺母柱【M3】_Dr底孔4 (cut)
    with BuildSketch(Plane(origin=(0, 0, 0), x_dir=(1, 0, 0), z_dir=(0, 1, 0)).offset(M3_DR_4_START)):
        with Locations((30, -115)):
            Circle(M3_DR_4_OUTLINE_R)
        with Locations((30, -115)):
            Circle(M3_DR_4_OUTLINE_R_2, mode=Mode.SUBTRACT)
    extrude(amount=M3_DR_4_DEPTH, mode=Mode.SUBTRACT)

    # 压铆螺母柱【M3】_Dr底孔5 outline → 压铆螺母柱【M3】_Dr底孔5 (cut)
    with BuildSketch(Plane(origin=(0, 0, 0), x_dir=(1, 0, 0), z_dir=(0, 1, 0)).offset(M3_DR_5_START)):
        with Locations((30, -30)):
            Circle(M3_DR_5_OUTLINE_R)
        with Locations((30, -30)):
            Circle(M3_DR_5_OUTLINE_R_2, mode=Mode.SUBTRACT)
    extrude(amount=M3_DR_5_DEPTH, mode=Mode.SUBTRACT)


with BuildPart() as body_2:
    # 草图54 → 凸台-拉伸1 (new body)
    with BuildSketch(Plane(origin=(0, 0, 0), x_dir=(1, 0, 0), z_dir=(0, 1, 0))):
        with Locations(Location((30, -30, 0), (0, 0, 270))):
            Circle(SKETCH_54_R)
        with Locations(Location((30, -30, 0), (0, 0, 270))):
            Circle(SKETCH_54_R_2, mode=Mode.SUBTRACT)
    extrude(amount=EXTRUDE_1_DEPTH)


with BuildPart() as body_3:
    # 草图54 → Extrude 1 2 (new body)
    with BuildSketch(Plane(origin=(0, 0, 0), x_dir=(1, 0, 0), z_dir=(0, 1, 0))):
        with Locations(Location((-165, -30, 0), (0, 0, 270))):
            Circle(SKETCH_54_R)
        with Locations(Location((-165, -30, 0), (0, 0, 270))):
            Circle(SKETCH_54_R_2, mode=Mode.SUBTRACT)
    extrude(amount=EXTRUDE_1_2_DEPTH)


with BuildPart() as body_4:
    # 草图54 → Extrude 1 3 (new body)
    with BuildSketch(Plane(origin=(0, 0, 0), x_dir=(1, 0, 0), z_dir=(0, 1, 0))):
        with Locations(Location((-165, -115, 0), (0, 0, 270))):
            Circle(SKETCH_54_R)
        with Locations(Location((-165, -115, 0), (0, 0, 270))):
            Circle(SKETCH_54_R_2, mode=Mode.SUBTRACT)
    extrude(amount=EXTRUDE_1_3_DEPTH)


with BuildPart() as body_5:
    # 草图54 → Extrude 1 4 (new body)
    with BuildSketch(Plane(origin=(0, 0, 0), x_dir=(1, 0, 0), z_dir=(0, 1, 0))):
        with Locations(Location((-165, -200, 0), (0, 0, 270))):
            Circle(SKETCH_54_R)
        with Locations(Location((-165, -200, 0), (0, 0, 270))):
            Circle(SKETCH_54_R_2, mode=Mode.SUBTRACT)
    extrude(amount=EXTRUDE_1_4_DEPTH)


with BuildPart() as body_6:
    # 草图54 → Extrude 1 5 (new body)
    with BuildSketch(Plane(origin=(0, 0, 0), x_dir=(1, 0, 0), z_dir=(0, 1, 0))):
        with Locations(Location((30, -115, 0), (0, 0, 270))):
            Circle(SKETCH_54_R)
        with Locations(Location((30, -115, 0), (0, 0, 270))):
            Circle(SKETCH_54_R_2, mode=Mode.SUBTRACT)
    extrude(amount=EXTRUDE_1_5_DEPTH)


with BuildPart() as body_7:
    # 草图54 → Extrude 1 6 (new body)
    with BuildSketch(Plane(origin=(0, 0, 0), x_dir=(1, 0, 0), z_dir=(0, 1, 0))):
        with Locations(Location((30, -200, 0), (0, 0, 270))):
            Circle(SKETCH_54_R)
        with Locations(Location((30, -200, 0), (0, 0, 270))):
            Circle(SKETCH_54_R_2, mode=Mode.SUBTRACT)
    extrude(amount=EXTRUDE_1_6_DEPTH)


solid = part.part
